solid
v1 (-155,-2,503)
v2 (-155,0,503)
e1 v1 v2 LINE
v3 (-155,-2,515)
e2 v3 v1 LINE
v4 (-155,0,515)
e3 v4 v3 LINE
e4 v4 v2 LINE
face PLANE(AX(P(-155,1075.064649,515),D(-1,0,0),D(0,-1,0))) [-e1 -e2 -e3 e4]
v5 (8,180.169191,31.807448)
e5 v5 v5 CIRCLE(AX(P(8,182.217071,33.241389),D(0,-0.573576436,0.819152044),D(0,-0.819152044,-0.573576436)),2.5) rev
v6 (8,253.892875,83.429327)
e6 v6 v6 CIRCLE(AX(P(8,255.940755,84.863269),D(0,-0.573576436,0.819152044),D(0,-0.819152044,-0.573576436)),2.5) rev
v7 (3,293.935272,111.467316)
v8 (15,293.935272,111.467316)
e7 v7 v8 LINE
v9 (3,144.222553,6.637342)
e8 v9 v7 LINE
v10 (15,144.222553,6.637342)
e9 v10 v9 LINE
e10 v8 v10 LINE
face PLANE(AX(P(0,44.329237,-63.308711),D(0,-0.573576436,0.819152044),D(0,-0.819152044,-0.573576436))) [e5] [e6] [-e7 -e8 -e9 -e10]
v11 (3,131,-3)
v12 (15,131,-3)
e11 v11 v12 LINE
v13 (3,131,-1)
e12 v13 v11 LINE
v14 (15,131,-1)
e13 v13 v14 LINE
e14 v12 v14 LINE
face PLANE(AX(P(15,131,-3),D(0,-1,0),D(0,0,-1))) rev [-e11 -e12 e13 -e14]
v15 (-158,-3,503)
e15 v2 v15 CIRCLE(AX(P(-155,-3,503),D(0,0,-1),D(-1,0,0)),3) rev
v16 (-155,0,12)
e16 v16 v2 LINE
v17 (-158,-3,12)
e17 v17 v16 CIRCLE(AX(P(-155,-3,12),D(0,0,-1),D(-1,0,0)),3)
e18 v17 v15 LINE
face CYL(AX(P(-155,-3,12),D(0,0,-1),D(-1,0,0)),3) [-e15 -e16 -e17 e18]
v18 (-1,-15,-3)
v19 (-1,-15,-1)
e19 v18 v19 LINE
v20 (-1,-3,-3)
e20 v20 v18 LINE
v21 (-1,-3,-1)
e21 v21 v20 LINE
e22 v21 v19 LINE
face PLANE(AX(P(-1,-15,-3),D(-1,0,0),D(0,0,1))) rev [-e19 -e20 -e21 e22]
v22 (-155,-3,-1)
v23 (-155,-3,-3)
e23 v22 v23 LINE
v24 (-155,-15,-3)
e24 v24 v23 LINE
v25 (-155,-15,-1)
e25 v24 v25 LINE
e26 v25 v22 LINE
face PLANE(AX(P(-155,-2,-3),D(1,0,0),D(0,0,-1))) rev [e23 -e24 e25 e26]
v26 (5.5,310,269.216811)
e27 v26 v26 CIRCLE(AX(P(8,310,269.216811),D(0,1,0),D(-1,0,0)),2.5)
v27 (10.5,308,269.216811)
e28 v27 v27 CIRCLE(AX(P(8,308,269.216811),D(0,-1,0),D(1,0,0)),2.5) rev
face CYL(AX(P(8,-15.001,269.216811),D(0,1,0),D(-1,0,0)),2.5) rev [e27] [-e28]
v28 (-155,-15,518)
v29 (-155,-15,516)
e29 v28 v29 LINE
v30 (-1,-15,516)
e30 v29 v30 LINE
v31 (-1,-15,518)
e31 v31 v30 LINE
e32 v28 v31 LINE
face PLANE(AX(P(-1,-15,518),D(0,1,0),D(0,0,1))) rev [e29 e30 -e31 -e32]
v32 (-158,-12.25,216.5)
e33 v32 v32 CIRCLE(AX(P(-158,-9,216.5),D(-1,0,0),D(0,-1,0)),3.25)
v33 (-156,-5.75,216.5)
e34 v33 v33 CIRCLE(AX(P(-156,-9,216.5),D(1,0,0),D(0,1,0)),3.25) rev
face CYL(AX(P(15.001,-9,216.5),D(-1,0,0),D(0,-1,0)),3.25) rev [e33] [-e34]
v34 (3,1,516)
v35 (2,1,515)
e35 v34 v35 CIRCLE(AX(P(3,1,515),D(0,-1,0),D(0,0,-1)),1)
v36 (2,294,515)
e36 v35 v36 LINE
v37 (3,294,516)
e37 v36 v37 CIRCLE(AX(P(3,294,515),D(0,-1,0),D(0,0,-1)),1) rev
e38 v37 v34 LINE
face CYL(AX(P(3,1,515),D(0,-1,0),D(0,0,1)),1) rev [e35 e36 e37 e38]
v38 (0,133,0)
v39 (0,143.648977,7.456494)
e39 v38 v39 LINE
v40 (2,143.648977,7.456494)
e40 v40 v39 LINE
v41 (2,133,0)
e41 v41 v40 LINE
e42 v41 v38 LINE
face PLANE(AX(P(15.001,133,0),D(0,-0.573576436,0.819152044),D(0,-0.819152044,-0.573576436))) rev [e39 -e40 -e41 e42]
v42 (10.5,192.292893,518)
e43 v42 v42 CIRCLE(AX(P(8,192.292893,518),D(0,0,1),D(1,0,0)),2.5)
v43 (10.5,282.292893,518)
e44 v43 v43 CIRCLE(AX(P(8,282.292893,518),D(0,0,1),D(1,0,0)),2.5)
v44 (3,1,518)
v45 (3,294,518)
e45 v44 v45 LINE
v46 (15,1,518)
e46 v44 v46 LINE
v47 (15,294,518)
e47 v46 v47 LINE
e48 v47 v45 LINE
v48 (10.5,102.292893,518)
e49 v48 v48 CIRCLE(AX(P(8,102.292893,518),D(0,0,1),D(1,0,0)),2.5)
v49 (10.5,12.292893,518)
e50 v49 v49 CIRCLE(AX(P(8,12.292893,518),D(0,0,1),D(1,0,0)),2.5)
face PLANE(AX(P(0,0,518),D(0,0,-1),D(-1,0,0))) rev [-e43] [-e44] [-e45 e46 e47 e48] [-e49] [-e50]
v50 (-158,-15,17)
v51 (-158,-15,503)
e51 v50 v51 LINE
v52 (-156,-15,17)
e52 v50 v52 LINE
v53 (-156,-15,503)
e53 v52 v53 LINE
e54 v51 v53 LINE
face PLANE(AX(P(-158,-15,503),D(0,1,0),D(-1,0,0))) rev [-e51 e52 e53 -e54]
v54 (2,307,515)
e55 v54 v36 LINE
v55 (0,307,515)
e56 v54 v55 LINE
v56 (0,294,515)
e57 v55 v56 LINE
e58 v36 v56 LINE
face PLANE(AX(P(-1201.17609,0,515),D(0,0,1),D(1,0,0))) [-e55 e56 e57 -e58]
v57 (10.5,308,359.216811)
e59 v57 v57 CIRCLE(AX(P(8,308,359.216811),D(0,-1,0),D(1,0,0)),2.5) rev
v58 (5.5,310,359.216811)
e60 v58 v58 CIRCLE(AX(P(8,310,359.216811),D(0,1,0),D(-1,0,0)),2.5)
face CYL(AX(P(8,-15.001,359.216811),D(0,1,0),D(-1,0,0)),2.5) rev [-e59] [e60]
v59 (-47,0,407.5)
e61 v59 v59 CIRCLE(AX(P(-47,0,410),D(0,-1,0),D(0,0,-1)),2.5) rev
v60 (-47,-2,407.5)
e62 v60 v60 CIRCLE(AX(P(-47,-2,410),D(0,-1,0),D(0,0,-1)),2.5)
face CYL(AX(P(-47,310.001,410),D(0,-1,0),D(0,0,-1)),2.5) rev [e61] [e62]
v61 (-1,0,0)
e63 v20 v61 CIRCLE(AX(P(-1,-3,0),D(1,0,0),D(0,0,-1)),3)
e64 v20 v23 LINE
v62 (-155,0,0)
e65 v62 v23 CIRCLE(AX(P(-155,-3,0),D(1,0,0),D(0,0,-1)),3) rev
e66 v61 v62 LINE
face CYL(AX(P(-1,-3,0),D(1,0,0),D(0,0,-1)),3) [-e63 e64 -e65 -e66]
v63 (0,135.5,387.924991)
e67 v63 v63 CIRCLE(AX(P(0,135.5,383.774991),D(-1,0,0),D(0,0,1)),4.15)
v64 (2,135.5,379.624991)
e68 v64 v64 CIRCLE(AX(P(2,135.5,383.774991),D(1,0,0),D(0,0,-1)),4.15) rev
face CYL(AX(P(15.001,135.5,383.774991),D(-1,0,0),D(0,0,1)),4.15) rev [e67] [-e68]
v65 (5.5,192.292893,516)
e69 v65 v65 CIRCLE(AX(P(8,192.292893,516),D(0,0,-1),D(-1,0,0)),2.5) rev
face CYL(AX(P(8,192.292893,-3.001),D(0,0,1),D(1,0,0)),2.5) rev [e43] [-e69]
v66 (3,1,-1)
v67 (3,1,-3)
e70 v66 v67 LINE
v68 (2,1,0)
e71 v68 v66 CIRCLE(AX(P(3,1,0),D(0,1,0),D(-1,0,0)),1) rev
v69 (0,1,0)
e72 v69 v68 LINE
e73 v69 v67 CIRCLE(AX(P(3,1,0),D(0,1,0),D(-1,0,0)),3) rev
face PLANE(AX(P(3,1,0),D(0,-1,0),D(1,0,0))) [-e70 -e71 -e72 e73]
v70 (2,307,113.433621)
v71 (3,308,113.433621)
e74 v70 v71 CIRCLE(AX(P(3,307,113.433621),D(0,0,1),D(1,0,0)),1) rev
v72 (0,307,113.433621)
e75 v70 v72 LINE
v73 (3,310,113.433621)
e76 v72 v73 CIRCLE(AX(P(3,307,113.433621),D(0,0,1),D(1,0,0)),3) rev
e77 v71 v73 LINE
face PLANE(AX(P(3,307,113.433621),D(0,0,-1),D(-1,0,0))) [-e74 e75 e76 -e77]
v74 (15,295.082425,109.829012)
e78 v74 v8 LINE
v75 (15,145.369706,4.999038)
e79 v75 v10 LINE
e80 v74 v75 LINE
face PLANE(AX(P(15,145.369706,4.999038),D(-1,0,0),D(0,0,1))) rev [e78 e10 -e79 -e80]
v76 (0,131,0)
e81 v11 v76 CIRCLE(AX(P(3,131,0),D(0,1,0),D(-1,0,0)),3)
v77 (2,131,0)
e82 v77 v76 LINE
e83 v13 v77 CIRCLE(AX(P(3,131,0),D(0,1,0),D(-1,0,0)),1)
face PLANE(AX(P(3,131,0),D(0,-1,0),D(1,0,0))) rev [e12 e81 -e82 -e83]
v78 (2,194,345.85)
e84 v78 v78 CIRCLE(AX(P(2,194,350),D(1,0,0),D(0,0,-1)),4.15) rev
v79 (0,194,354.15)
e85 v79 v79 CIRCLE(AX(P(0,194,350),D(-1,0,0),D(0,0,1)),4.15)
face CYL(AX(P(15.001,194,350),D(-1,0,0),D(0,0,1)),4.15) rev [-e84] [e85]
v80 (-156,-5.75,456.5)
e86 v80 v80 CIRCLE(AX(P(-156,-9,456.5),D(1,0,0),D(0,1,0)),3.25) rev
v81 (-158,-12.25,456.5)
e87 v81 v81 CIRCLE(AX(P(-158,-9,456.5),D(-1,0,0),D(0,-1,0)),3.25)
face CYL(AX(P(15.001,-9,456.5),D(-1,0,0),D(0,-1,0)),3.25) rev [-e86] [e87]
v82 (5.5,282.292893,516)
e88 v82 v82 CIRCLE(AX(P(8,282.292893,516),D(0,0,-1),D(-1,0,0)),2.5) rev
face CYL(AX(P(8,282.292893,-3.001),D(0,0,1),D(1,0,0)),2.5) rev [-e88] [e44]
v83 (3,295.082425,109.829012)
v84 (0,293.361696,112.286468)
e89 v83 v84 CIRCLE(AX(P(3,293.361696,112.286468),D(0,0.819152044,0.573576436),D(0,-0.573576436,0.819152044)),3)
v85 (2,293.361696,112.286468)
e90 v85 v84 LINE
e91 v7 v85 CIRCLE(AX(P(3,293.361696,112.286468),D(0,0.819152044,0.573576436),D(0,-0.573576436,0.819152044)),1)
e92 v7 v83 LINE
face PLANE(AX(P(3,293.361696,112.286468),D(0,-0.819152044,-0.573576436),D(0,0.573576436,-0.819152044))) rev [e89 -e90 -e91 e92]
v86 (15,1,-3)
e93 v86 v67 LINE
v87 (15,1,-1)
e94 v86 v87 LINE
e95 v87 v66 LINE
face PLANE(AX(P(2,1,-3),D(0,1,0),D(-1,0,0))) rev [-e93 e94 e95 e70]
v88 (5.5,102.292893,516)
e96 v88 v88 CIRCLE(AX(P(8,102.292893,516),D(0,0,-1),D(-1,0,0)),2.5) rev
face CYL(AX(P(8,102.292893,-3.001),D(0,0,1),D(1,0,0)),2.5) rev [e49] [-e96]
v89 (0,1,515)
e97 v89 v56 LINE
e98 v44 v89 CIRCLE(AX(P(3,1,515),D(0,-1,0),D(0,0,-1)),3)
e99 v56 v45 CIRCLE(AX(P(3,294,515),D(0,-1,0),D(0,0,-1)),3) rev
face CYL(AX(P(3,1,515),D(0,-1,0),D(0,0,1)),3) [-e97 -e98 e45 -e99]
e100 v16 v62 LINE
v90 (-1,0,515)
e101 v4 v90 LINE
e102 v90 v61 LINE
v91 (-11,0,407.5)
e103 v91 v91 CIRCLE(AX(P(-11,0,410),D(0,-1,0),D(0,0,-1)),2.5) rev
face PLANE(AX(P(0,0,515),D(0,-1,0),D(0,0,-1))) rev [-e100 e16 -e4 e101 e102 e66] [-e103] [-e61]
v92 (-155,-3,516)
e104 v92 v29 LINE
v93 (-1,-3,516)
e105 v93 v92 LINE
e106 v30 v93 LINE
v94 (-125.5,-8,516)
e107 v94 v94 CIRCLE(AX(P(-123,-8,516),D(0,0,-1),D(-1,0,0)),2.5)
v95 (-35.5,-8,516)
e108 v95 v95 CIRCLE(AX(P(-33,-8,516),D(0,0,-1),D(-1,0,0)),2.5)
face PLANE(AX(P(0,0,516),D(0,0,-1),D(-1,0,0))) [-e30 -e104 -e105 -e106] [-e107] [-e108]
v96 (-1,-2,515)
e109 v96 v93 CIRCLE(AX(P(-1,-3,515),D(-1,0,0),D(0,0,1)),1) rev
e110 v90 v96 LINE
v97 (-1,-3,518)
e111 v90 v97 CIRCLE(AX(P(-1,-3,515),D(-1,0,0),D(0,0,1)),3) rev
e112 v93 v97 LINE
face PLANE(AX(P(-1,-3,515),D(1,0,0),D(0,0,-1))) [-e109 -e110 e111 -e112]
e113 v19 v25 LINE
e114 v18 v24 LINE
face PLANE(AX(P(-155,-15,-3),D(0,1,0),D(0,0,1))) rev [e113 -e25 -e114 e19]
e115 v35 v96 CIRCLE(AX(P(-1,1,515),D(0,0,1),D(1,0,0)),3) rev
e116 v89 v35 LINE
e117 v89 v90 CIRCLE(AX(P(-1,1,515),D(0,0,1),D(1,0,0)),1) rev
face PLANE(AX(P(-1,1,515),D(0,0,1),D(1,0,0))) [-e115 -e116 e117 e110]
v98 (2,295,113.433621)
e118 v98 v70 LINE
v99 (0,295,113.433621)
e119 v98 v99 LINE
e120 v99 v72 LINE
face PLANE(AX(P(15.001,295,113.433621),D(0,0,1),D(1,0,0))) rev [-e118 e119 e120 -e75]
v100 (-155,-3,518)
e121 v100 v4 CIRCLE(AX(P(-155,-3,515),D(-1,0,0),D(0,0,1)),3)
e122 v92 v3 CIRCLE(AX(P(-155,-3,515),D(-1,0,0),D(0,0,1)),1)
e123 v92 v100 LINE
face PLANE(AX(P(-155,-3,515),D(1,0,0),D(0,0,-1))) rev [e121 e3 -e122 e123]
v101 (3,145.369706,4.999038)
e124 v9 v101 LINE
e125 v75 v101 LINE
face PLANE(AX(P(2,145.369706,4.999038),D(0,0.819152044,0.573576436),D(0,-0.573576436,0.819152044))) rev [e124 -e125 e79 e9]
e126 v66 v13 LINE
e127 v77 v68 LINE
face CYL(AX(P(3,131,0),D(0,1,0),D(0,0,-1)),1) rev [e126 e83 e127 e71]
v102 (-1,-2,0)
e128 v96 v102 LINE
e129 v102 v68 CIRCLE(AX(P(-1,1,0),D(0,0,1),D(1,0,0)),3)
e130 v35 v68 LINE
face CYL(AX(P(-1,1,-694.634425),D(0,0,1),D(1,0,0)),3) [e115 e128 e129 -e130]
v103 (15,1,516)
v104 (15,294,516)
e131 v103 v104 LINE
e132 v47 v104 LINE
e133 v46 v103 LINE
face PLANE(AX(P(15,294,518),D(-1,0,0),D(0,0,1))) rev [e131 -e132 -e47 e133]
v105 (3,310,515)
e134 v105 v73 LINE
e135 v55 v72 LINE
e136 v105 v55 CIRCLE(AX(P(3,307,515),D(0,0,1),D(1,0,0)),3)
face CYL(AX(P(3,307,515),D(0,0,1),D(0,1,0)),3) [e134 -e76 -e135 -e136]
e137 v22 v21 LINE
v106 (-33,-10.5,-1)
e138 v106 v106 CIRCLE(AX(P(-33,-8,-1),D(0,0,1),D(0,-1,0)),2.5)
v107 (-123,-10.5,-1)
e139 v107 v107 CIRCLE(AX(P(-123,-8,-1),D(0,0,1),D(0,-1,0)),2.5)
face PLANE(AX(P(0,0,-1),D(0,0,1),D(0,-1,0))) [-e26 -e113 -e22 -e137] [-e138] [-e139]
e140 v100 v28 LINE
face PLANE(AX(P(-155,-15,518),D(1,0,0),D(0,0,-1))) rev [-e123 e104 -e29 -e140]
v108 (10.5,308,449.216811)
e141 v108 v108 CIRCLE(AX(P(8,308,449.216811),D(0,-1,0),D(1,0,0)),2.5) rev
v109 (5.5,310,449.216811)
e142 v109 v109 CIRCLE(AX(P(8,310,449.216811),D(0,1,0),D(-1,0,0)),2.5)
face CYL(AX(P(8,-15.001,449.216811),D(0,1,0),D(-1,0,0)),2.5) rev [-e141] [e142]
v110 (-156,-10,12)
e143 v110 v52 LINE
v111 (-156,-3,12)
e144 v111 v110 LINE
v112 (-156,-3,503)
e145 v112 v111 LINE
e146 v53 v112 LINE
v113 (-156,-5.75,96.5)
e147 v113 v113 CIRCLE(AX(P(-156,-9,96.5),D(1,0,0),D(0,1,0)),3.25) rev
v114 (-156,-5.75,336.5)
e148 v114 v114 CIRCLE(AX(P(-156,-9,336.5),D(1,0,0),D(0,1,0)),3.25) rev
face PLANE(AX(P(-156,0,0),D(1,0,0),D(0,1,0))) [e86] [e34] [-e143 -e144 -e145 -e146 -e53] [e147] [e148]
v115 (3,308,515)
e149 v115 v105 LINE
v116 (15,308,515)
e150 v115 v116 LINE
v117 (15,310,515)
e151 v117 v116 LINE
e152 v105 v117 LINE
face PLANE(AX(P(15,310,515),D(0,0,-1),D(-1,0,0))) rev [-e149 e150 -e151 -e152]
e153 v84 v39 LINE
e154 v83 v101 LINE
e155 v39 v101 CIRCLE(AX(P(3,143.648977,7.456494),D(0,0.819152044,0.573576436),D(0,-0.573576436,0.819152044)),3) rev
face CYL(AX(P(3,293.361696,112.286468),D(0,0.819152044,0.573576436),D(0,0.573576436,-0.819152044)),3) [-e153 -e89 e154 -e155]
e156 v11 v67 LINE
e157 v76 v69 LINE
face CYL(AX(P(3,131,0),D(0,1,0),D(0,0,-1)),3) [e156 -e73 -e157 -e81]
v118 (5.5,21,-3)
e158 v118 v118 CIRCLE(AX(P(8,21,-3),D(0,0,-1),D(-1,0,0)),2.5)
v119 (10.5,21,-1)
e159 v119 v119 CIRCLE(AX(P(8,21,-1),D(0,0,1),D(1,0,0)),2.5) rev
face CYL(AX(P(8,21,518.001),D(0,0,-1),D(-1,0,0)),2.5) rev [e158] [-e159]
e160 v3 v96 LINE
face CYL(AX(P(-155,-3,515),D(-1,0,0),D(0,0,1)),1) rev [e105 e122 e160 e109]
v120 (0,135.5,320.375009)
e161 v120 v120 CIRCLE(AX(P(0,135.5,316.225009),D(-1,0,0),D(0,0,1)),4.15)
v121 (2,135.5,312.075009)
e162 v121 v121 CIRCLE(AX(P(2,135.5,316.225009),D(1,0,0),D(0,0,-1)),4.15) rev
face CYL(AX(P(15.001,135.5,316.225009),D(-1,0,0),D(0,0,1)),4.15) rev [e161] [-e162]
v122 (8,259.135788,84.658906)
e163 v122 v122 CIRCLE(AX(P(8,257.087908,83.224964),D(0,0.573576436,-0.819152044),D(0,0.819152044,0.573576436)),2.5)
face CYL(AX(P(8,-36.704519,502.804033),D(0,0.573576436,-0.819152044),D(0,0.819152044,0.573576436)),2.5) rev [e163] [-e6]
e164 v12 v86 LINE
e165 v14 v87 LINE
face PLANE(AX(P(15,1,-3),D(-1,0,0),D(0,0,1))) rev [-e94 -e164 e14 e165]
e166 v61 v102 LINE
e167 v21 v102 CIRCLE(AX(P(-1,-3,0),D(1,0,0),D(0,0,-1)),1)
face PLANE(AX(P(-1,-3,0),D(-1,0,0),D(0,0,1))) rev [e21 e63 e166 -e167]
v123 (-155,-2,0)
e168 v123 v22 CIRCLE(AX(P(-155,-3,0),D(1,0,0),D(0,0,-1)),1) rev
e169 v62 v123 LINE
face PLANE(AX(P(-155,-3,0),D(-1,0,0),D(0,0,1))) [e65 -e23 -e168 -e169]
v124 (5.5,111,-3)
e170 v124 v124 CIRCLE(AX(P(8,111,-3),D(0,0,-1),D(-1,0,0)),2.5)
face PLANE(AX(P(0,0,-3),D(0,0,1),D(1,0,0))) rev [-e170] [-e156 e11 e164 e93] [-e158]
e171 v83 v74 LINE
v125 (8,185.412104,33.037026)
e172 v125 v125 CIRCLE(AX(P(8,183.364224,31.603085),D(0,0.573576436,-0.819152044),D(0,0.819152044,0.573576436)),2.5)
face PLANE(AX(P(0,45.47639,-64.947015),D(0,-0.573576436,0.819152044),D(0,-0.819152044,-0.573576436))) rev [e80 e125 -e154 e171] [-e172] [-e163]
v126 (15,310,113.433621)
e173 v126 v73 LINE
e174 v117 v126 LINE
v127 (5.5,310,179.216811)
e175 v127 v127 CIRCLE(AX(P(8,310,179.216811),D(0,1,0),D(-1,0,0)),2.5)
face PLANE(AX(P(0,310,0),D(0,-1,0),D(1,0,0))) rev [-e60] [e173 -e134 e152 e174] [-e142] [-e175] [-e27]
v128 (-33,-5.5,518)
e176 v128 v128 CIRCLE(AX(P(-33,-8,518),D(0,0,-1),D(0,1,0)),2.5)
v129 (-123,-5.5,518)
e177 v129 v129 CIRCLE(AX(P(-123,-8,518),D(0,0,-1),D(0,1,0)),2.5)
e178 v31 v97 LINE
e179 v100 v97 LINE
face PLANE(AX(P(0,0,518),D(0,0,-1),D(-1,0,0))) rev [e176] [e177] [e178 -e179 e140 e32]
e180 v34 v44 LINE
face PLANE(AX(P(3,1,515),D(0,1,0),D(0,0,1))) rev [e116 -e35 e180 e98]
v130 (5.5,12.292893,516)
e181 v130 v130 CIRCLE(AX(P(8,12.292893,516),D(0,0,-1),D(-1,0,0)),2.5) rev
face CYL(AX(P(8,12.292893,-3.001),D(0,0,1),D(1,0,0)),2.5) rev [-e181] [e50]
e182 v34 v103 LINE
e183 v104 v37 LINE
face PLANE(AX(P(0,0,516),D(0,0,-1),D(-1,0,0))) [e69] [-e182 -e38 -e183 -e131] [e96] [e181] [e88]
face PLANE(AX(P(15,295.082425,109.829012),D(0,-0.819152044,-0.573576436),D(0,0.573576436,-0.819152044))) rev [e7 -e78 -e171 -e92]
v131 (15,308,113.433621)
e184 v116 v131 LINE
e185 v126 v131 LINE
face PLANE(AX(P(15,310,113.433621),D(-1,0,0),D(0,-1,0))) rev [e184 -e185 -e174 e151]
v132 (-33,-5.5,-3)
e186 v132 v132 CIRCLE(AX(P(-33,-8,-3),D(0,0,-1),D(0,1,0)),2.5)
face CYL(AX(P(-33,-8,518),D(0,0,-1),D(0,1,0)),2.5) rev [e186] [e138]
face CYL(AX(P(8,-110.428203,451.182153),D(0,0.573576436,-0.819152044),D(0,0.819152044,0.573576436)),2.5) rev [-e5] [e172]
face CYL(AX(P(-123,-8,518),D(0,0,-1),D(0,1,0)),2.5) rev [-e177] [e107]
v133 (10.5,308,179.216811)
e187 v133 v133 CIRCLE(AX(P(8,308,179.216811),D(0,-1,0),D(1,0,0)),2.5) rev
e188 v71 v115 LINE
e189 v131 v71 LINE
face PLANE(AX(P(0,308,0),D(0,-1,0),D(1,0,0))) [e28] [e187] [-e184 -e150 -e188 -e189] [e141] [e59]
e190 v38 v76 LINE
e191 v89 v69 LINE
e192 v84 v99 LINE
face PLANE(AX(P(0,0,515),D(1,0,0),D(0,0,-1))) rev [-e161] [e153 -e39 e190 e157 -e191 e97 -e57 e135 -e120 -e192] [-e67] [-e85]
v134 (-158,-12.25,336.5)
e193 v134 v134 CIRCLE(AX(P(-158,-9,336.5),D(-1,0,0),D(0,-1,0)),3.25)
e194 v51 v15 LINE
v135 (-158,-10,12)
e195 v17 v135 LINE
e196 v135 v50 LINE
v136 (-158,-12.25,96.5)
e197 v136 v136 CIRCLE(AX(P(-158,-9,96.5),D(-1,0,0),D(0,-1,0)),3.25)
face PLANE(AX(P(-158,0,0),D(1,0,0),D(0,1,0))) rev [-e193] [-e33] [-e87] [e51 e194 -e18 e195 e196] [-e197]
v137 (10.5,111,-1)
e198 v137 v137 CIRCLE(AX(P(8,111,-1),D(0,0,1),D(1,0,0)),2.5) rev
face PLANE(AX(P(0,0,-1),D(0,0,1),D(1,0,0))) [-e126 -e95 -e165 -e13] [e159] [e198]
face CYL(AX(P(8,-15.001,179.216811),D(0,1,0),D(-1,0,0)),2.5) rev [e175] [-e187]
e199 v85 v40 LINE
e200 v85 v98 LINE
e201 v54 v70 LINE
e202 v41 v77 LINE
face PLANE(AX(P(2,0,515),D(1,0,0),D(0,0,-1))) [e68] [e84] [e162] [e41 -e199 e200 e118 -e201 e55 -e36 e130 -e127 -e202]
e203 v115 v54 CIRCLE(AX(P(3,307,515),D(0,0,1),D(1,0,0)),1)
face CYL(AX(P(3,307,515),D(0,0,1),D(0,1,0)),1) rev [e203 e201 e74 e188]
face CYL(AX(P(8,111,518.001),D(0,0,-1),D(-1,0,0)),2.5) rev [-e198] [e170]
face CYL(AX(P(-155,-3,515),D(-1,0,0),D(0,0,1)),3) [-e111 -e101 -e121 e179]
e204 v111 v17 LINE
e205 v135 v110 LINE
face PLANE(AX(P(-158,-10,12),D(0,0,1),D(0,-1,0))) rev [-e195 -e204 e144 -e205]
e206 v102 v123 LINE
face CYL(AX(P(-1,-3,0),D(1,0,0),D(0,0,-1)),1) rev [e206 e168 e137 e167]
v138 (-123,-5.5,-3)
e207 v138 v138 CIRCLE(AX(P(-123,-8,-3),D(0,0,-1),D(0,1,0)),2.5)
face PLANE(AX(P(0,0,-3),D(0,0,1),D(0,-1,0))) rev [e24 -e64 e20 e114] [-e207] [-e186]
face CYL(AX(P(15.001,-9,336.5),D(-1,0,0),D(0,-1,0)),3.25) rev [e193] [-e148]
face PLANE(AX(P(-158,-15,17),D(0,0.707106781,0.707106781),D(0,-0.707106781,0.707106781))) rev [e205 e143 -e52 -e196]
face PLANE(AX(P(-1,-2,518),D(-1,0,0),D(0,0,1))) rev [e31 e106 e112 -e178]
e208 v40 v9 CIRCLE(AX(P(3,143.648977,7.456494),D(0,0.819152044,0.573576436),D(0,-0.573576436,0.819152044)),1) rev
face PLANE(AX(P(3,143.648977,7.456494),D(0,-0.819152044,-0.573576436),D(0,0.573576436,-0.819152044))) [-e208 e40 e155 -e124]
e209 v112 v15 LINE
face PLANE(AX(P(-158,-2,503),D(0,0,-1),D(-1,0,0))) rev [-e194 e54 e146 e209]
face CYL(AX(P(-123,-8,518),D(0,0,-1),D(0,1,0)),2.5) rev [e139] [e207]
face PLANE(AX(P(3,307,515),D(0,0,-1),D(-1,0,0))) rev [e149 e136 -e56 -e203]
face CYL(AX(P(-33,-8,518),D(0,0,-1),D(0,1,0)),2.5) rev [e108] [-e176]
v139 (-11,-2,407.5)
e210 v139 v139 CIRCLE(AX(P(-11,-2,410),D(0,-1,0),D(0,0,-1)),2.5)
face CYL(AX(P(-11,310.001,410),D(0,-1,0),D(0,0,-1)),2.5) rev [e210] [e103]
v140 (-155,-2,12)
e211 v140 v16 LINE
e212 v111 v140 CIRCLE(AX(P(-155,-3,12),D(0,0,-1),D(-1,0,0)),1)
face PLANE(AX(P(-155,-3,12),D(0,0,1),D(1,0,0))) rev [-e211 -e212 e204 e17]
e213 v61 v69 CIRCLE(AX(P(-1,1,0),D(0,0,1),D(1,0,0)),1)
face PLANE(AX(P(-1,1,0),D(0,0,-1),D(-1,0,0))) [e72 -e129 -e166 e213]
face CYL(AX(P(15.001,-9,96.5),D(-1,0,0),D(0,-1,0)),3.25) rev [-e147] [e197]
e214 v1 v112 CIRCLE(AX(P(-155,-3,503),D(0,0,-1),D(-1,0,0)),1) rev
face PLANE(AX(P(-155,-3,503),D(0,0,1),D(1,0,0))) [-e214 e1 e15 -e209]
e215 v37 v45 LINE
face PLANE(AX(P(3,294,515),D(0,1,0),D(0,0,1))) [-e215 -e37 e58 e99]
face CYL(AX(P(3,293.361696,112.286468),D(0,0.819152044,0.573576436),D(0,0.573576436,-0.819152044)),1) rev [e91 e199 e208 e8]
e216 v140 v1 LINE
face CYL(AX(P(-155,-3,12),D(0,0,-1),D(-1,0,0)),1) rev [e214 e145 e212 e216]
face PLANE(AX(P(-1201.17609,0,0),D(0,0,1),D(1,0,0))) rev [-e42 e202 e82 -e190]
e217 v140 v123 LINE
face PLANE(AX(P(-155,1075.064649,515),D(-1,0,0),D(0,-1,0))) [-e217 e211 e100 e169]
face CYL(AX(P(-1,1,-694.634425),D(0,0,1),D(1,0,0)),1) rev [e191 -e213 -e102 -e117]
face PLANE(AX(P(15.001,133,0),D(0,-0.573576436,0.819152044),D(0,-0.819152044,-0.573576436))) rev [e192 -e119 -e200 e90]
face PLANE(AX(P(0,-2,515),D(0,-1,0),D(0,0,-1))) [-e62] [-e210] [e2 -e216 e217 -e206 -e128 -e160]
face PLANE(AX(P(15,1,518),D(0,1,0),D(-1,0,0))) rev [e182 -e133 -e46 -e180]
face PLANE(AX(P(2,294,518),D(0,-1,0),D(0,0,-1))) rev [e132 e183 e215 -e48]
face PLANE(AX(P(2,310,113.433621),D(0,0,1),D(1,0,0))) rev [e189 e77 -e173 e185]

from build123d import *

# Parameters (mm, degrees)
EXTRUDE_1_DEPTH                  = 515
SHEET_METAL_1_OUTLINE_W          = 155
SHEET_METAL_1_OUTLINE_H          = 2
SHEET_METAL_1_DEPTH              = 515
SHEET_METAL_1_2_OUTLINE_W        = 2
SHEET_METAL_1_2_OUTLINE_H        = 154.141592654
SHEET_METAL_1_2_DEPTH            = 515
SHEET_METAL_1_3_DEPTH            = 515
SHEET_METAL_1_3_2_DEPTH          = 515
SM_EDGE_FLANGE_1_DEPTH           = 154
SM_EDGE_FLANGE_1_BEND_DEPTH      = 130
SM_EDGE_FLANGE_1_BEND_2_DEPTH    = 154
SM_EDGE_FLANGE_1_BEND_3_DEPTH    = 491
SM_START                         = 2
SM_EDGE_FLANGE_1_FLAT_DEPTH      = 2
SM_EDGE_FLANGE_1_BEND_4_DEPTH    = 293
CUT_EXTRUDE_1_REACH              = 626.01
SKETCH_21_R                      = 4.15
CUT_EXTRUDE_2_REACH              = 626.01
SM_EDGE_FLANGE_3_STRIP_W         = 10
SM_EDGE_FLANGE_3_STRIP_H         = 2
SM_EDGE_FLANGE_3_STRIP_CUT_DEPTH = 401.56637881
SM_EDGE_FLANGE_3_DEPTH           = 401.56637881
SM_EDGE_FLANGE_4_DEPTH           = 182.765483379
SKETCH_36_R                      = 2.5
CUT_EXTRUDE_2624_DEPTH           = 627.502194729
CUT_EXTRUDE_2823_REACH           = 628.502
SKETCH_38_R                      = 2.5
CUT_EXTRUDE_3033_REACH           = 661.366
SKETCH_39_R                      = 2.5
CUT_EXTRUDE_3335_REACH           = 628.502
SKETCH_40_R                      = 2.5
CUT_EXTRUDE_8_REACH              = 633.596
SKETCH_41_R                      = 2.5
CUT_EXTRUDE_4081_REACH           = 629.975
SKETCH_42_R                      = 3.25
CUT_EXTRUDE_10_REACH             = 627.006
SKETCH_43_R                      = 2.5


# Read off the part's stored shape, not the designer's step: Плоское состояние1, Согнутое состояние1
# Sheet-metal steps are written as plain solids
with BuildPart() as part:
    # Sketch 1 → Вытянуть-Тонкостенный1 (new body)
    with BuildSketch(Plane.XY):
        Polygon((-155, 0), (0, 0), (0, 310), (2, 310), (2, -2), (-155, -2), align=None)
    extrude(amount=EXTRUDE_1_DEPTH)

    # Sheet Metal 1 outline → Sheet Metal 1 (cut)
    with BuildSketch(Plane.XY):
        with Locations((-77.5, -1)):
            Rectangle(SHEET_METAL_1_OUTLINE_W, SHEET_METAL_1_OUTLINE_H)
    extrude(amount=SHEET_METAL_1_DEPTH, mode=Mode.SUBTRACT)

    # Sheet Metal 1 2 outline → Sheet Metal 1 2 (add)
    with BuildSketch(Plane.XY):
        with Locations((1, -79.070796327)):
            Rectangle(SHEET_METAL_1_2_OUTLINE_W, SHEET_METAL_1_2_OUTLINE_H)
    extrude(amount=SHEET_METAL_1_2_DEPTH)

    # Sheet Metal 1 3 outline → Sheet Metal 1 3 (cut)
    with BuildSketch(Plane.XY):
        with BuildLine():
            ThreePointArc((2, 1), (1.449489743, -0.732050808), (0, -1.828427125))
            Line((0, -1.828427125), (0, -156.141592654))
            Line((0, -156.141592654), (2, -156.141592654))
            Line((2, -156.141592654), (2, 1))
        make_face()
    extrude(amount=SHEET_METAL_1_3_DEPTH, mode=Mode.SUBTRACT)

    # Sheet Metal 1 3 2 outline → Sheet Metal 1 3 2 (add)
    with BuildSketch(Plane.XY):
        with BuildLine():
            Line((-1, 0), (-155, 0))
            Line((-155, 0), (-155, -2))
            Line((-155, -2), (-1, -2))
            ThreePointArc((-1, -2), (-0.492694064, -1.956795679), (0, -1.828427125))
            Line((0, -1.828427125), (0, 1))
            ThreePointArc((0, 1), (-0.292893219, 0.292893219), (-1, 0))
        make_face()
    extrude(amount=SHEET_METAL_1_3_2_DEPTH)

    # Ребро-кромка1 section (across the edge) → Ребро-кромка1 (add)
    with BuildSketch(Plane(origin=(-155, -2, -1), x_dir=(0, 0, 1), z_dir=(1, 0, 0))):
        with BuildLine():
            Line((-2, 1), (-2, 13))
            Line((-2, 13), (0, 13))
            Line((0, 13), (0, 1))
            ThreePointArc((0, 1), (0.292893219, 0.292893219), (1, 0))
            Line((1, 0), (1, -2))
            ThreePointArc((1, -2), (-1.121320344, -1.121320344), (-2, 1))
        make_face()
    extrude(amount=SM_EDGE_FLANGE_1_DEPTH)

    # Ребро-кромка1 section 2 (across the edge) → Ребро-кромка1 bend (add)
    with BuildSketch(Plane(origin=(2, 1, -1), x_dir=(0, 0, 1), z_dir=(0, 1, 0))):
        with BuildLine():
            Line((-2, 1), (-2, 13))
            Line((-2, 13), (0, 13))
            Line((0, 13), (0, 1))
            ThreePointArc((0, 1), (0.292893219, 0.292893219), (1, 0))
            Line((1, 0), (1, -2))
            ThreePointArc((1, -2), (-1.121320344, -1.121320344), (-2, 1))
        make_face()
    extrude(amount=SM_EDGE_FLANGE_1_BEND_DEPTH)

    # Ребро-кромка1 section 3 (across the edge) → Ребро-кромка1 bend 2 (add)
    with BuildSketch(Plane(origin=(-1, -2, 516), x_dir=(0, 0, -1), z_dir=(-1, 0, 0))):
        with BuildLine():
            Line((-2, 1), (-2, 13))
            Line((-2, 13), (0, 13))
            Line((0, 13), (0, 1))
            ThreePointArc((0, 1), (0.292893219, 0.292893219), (1, 0))
            Line((1, 0), (1, -2))
            ThreePointArc((1, -2), (-1.121320344, -1.121320344), (-2, 1))
        make_face()
    extrude(amount=SM_EDGE_FLANGE_1_BEND_2_DEPTH)

    # Ребро-кромка1 bend section (across the edge) → Ребро-кромка1 bend 3 (add)
    with BuildSketch(Plane(origin=(-156, -2, 503), x_dir=(1, 0, 0), z_dir=(0, 0, -1))):
        with BuildLine():
            Line((-2, 1), (0, 1))
            ThreePointArc((0, 1), (0.292893219, 0.292893219), (1, 0))
            Line((1, 0), (1, -2))
            ThreePointArc((1, -2), (-1.121320344, -1.121320344), (-2, 1))
        make_face()
    extrude(amount=SM_EDGE_FLANGE_1_BEND_3_DEPTH)

    # Ребро-кромка1 profile (on flange) → Ребро-кромка1 flat (add)
    with BuildSketch(Plane(origin=(-156, -2, 0), x_dir=(0, 0, -1), z_dir=(-1, 0, 0)).offset(SM_START)):
        Polygon((-503, 13), (-503, 1), (-12, 1), (-12, 8), (-17, 13), align=None)
    extrude(amount=-SM_EDGE_FLANGE_1_FLAT_DEPTH)

    # Ребро-кромка1 section 4 (across the edge) → Ребро-кромка1 bend 4 (add)
    with BuildSketch(Plane(origin=(2, 294, 516), x_dir=(0, 0, -1), z_dir=(0, -1, 0))):
        with BuildLine():
            Line((-2, 1), (-2, 13))
            Line((-2, 13), (0, 13))
            Line((0, 13), (0, 1))
            ThreePointArc((0, 1), (0.292893219, 0.292893219), (1, 0))
            Line((1, 0), (1, -2))
            ThreePointArc((1, -2), (-1.121320344, -1.121320344), (-2, 1))
        make_face()
    extrude(amount=SM_EDGE_FLANGE_1_BEND_4_DEPTH)

    # Эскиз21 → Вырез-Вытянуть1 (cut, up to next)
    with BuildSketch(Plane.ZY, mode=Mode.PRIVATE) as cut_extrude_1_sk1:
        with Locations((316.225009252, 135.5)):
            Circle(SKETCH_21_R)
    cut_extrude_1_tool1 = extrude(cut_extrude_1_sk1.sketch, amount=-CUT_EXTRUDE_1_REACH, mode=Mode.PRIVATE) & part.part
    # Эскиз21 → Вырез-Вытянуть1 (cut, up to next)
    with BuildSketch(Plane.ZY, mode=Mode.PRIVATE) as cut_extrude_1_sk2:
        with Locations((383.774990748, 135.5)):
            Circle(SKETCH_21_R)
    cut_extrude_1_tool2 = extrude(cut_extrude_1_sk2.sketch, amount=-CUT_EXTRUDE_1_REACH, mode=Mode.PRIVATE) & part.part
    # Эскиз21 → Вырез-Вытянуть1 (cut, up to next)
    with BuildSketch(Plane.ZY, mode=Mode.PRIVATE) as cut_extrude_1_sk3:
        with Locations((350, 194)):
            Circle(SKETCH_21_R)
    cut_extrude_1_tool3 = extrude(cut_extrude_1_sk3.sketch, amount=-CUT_EXTRUDE_1_REACH, mode=Mode.PRIVATE) & part.part
    add(cut_extrude_1_tool1.solids().sort_by_distance((0, 135.5, 316.225009))[0], mode=Mode.SUBTRACT)
    add(cut_extrude_1_tool2.solids().sort_by_distance((0, 135.5, 383.774991))[0], mode=Mode.SUBTRACT)
    add(cut_extrude_1_tool3.solids().sort_by_distance((0, 194, 350))[0], mode=Mode.SUBTRACT)

    # Эскиз22 → Вырез-Вытянуть2 (cut, up to next)
    with BuildSketch(Plane.ZY, mode=Mode.PRIVATE) as cut_extrude_2_sk1:
        Polygon((0, 133), (113.43362119, 295), (113.43362119, 310), (0, 310), align=None)
    cut_extrude_2_tool1 = extrude(cut_extrude_2_sk1.sketch, amount=-CUT_EXTRUDE_2_REACH, mode=Mode.PRIVATE) & part.part
    add(cut_extrude_2_tool1.solids().sort_by_distance((0, 250.609375, 40.765208))[0], mode=Mode.SUBTRACT)

    # Ребро-кромка3 strip (across the edge) → Ребро-кромка3 strip cut (cut)
    with BuildSketch(Plane(origin=(2, 310, 113.43362119), x_dir=(0, -1, 0), z_dir=(0, 0, 1))):
        with Locations((-2, -1)):
            Rectangle(SM_EDGE_FLANGE_3_STRIP_W, SM_EDGE_FLANGE_3_STRIP_H)
    extrude(amount=SM_EDGE_FLANGE_3_STRIP_CUT_DEPTH, mode=Mode.SUBTRACT)

    # Ребро-кромка3 section (across the edge) → Ребро-кромка3 (add)
    with BuildSketch(Plane(origin=(2, 310, 113.43362119), x_dir=(0, -1, 0), z_dir=(0, 0, 1))):
        with BuildLine():
            Line((0, 1), (0, 13))
            Line((0, 13), (2, 13))
            Line((2, 13), (2, 1))
            ThreePointArc((2, 1), (2.292893219, 0.292893219), (3, 0))
            Line((3, 0), (3, -2))
            ThreePointArc((3, -2), (0.878679656, -1.121320344), (0, 1))
        make_face()
    extrude(amount=SM_EDGE_FLANGE_3_DEPTH)

    # Ребро-кромка4 section (across the edge) → Ребро-кромка4 (add)
    with BuildSketch(Plane(origin=(2, 144.222553012, 6.637341628), x_dir=(3.4914813388431334e-15, -0.5735764363510413, 0.8191520442889951), z_dir=(0, 0.8191520442889951, 0.5735764363510413))):
        with BuildLine():
            Line((-2, 1), (-2, 13))
            Line((-2, 13), (0, 13))
            Line((0, 13), (0, 1))
            ThreePointArc((0, 1), (0.292893219, 0.292893219), (1, 0))
            Line((1, 0), (1, -2))
            ThreePointArc((1, -2), (-1.121320344, -1.121320344), (-2, 1))
        make_face()
    extrude(amount=SM_EDGE_FLANGE_4_DEPTH)

    # Эскиз36 → Cut-Extrude 2624 (cut, through all)
    with BuildSketch(Plane(origin=(0, 0, -3), x_dir=(-1, 0, 0), z_dir=(0, 0, -1))):
        with Locations(Location((33, -8, 0), (0, 0, 90))):
            Circle(SKETCH_36_R)
        with Locations(Location((123, -8, 0), (0, 0, 90))):
            Circle(SKETCH_36_R)
    extrude(amount=-CUT_EXTRUDE_2624_DEPTH, mode=Mode.SUBTRACT)

    # Эскиз38 → Cut-Extrude 2823 (cut, up to next)
    with BuildSketch(Plane(origin=(0, 0, -3), x_dir=(-1, 0, 0), z_dir=(0, 0, -1)), mode=Mode.PRIVATE) as cut_extrude_2823_sk1:
        with Locations((-8, 111)):
            Circle(SKETCH_38_R)
    cut_extrude_2823_tool1 = extrude(cut_extrude_2823_sk1.sketch, amount=-CUT_EXTRUDE_2823_REACH, mode=Mode.PRIVATE) & part.part
    # Эскиз38 → Cut-Extrude 2823 (cut, up to next)
    with BuildSketch(Plane(origin=(0, 0, -3), x_dir=(-1, 0, 0), z_dir=(0, 0, -1)), mode=Mode.PRIVATE) as cut_extrude_2823_sk2:
        with Locations((-8, 21)):
            Circle(SKETCH_38_R)
    cut_extrude_2823_tool2 = extrude(cut_extrude_2823_sk2.sketch, amount=-CUT_EXTRUDE_2823_REACH, mode=Mode.PRIVATE) & part.part
    add(cut_extrude_2823_tool1.solids().sort_by_distance((8, 111, -3))[0], mode=Mode.SUBTRACT)
    add(cut_extrude_2823_tool2.solids().sort_by_distance((8, 21, -3))[0], mode=Mode.SUBTRACT)

    # Эскиз39 → Cut-Extrude 3033 (cut, up to next)
    with BuildSketch(Plane(origin=(0, 45.476389778, -64.947015415), x_dir=(-1, 0, 0), z_dir=(-1.7489258850738628e-15, 0.5735764363510414, -0.8191520442889951)), mode=Mode.PRIVATE) as cut_extrude_3033_sk1:
        with Locations(Location((-8, 258.32996358, 0), (0, 0, 90))):
            Circle(SKETCH_39_R)
    cut_extrude_3033_tool1 = extrude(cut_extrude_3033_sk1.sketch, amount=-CUT_EXTRUDE_3033_REACH, mode=Mode.PRIVATE) & part.part
    # Эскиз39 → Cut-Extrude 3033 (cut, up to next)
    with BuildSketch(Plane(origin=(0, 45.476389778, -64.947015415), x_dir=(-1, 0, 0), z_dir=(-1.7489258850738628e-15, 0.5735764363510414, -0.8191520442889951)), mode=Mode.PRIVATE) as cut_extrude_3033_sk2:
        with Locations(Location((-8, 168.32996358, 0), (0, 0, 90))):
            Circle(SKETCH_39_R)
    cut_extrude_3033_tool2 = extrude(cut_extrude_3033_sk2.sketch, amount=-CUT_EXTRUDE_3033_REACH, mode=Mode.PRIVATE) & part.part
    add(cut_extrude_3033_tool1.solids().sort_by_distance((8, 257.087908, 83.224964))[0], mode=Mode.SUBTRACT)
    add(cut_extrude_3033_tool2.solids().sort_by_distance((8, 183.364224, 31.603085))[0], mode=Mode.SUBTRACT)

    # Эскиз40 → Cut-Extrude 3335 (cut, up to next)
    with BuildSketch(Plane.XY.offset(518), mode=Mode.PRIVATE) as cut_extrude_3335_sk1:
        with Locations((8, 282.292893219)):
            Circle(SKETCH_40_R)
    cut_extrude_3335_tool1 = extrude(cut_extrude_3335_sk1.sketch, amount=-CUT_EXTRUDE_3335_REACH, mode=Mode.PRIVATE) & part.part
    # Эскиз40 → Cut-Extrude 3335 (cut, up to next)
    with BuildSketch(Plane.XY.offset(518), mode=Mode.PRIVATE) as cut_extrude_3335_sk2:
        with Locations((8, 192.292893219)):
            Circle(SKETCH_40_R)
    cut_extrude_3335_tool2 = extrude(cut_extrude_3335_sk2.sketch, amount=-CUT_EXTRUDE_3335_REACH, mode=Mode.PRIVATE) & part.part
    # Эскиз40 → Cut-Extrude 3335 (cut, up to next)
    with BuildSketch(Plane.XY.offset(518), mode=Mode.PRIVATE) as cut_extrude_3335_sk3:
        with Locations((8, 102.292893219)):
            Circle(SKETCH_40_R)
    cut_extrude_3335_tool3 = extrude(cut_extrude_3335_sk3.sketch, amount=-CUT_EXTRUDE_3335_REACH, mode=Mode.PRIVATE) & part.part
    # Эскиз40 → Cut-Extrude 3335 (cut, up to next)
    with BuildSketch(Plane.XY.offset(518), mode=Mode.PRIVATE) as cut_extrude_3335_sk4:
        with Locations((8, 12.292893219)):
            Circle(SKETCH_40_R)
    cut_extrude_3335_tool4 = extrude(cut_extrude_3335_sk4.sketch, amount=-CUT_EXTRUDE_3335_REACH, mode=Mode.PRIVATE) & part.part
    add(cut_extrude_3335_tool1.solids().sort_by_distance((8, 282.292893, 518))[0], mode=Mode.SUBTRACT)
    add(cut_extrude_3335_tool2.solids().sort_by_distance((8, 192.292893, 518))[0], mode=Mode.SUBTRACT)
    add(cut_extrude_3335_tool3.solids().sort_by_distance((8, 102.292893, 518))[0], mode=Mode.SUBTRACT)
    add(cut_extrude_3335_tool4.solids().sort_by_distance((8, 12.292893, 518))[0], mode=Mode.SUBTRACT)

    # Эскиз41 → Вырез-Вытянуть8 (cut, up to next)
    with BuildSketch(Plane(origin=(0, 310, 0), x_dir=(1, 0, 0), z_dir=(0, 1, 0)), mode=Mode.PRIVATE) as cut_extrude_8_sk1:
        with Locations(Location((8, -449.216810595, 0), (0, 0, 180))):
            Circle(SKETCH_41_R)
    cut_extrude_8_tool1 = extrude(cut_extrude_8_sk1.sketch, amount=-CUT_EXTRUDE_8_REACH, mode=Mode.PRIVATE) & part.part
    # Эскиз41 → Вырез-Вытянуть8 (cut, up to next)
    with BuildSketch(Plane(origin=(0, 310, 0), x_dir=(1, 0, 0), z_dir=(0, 1, 0)), mode=Mode.PRIVATE) as cut_extrude_8_sk2:
        with Locations(Location((8, -359.216810595, 0), (0, 0, 180))):
            Circle(SKETCH_41_R)
    cut_extrude_8_tool2 = extrude(cut_extrude_8_sk2.sketch, amount=-CUT_EXTRUDE_8_REACH, mode=Mode.PRIVATE) & part.part
    # Эскиз41 → Вырез-Вытянуть8 (cut, up to next)
    with BuildSketch(Plane(origin=(0, 310, 0), x_dir=(1, 0, 0), z_dir=(0, 1, 0)), mode=Mode.PRIVATE) as cut_extrude_8_sk3:
        with Locations(Location((8, -269.216810595, 0), (0, 0, 180))):
            Circle(SKETCH_41_R)
    cut_extrude_8_tool3 = extrude(cut_extrude_8_sk3.sketch, amount=-CUT_EXTRUDE_8_REACH, mode=Mode.PRIVATE) & part.part
    # Эскиз41 → Вырез-Вытянуть8 (cut, up to next)
    with BuildSketch(Plane(origin=(0, 310, 0), x_dir=(1, 0, 0), z_dir=(0, 1, 0)), mode=Mode.PRIVATE) as cut_extrude_8_sk4:
        with Locations(Location((8, -179.216810595, 0), (0, 0, 180))):
            Circle(SKETCH_41_R)
    cut_extrude_8_tool4 = extrude(cut_extrude_8_sk4.sketch, amount=-CUT_EXTRUDE_8_REACH, mode=Mode.PRIVATE) & part.part
    add(cut_extrude_8_tool1.solids().sort_by_distance((8, 310, 449.216811))[0], mode=Mode.SUBTRACT)
    add(cut_extrude_8_tool2.solids().sort_by_distance((8, 310, 359.216811))[0], mode=Mode.SUBTRACT)
    add(cut_extrude_8_tool3.solids().sort_by_distance((8, 310, 269.216811))[0], mode=Mode.SUBTRACT)
    add(cut_extrude_8_tool4.solids().sort_by_distance((8, 310, 179.216811))[0], mode=Mode.SUBTRACT)

    # Эскиз42 → Cut-Extrude 4081 (cut, up to next)
    with BuildSketch(Plane.ZY.offset(158), mode=Mode.PRIVATE) as cut_extrude_4081_sk1:
        with Locations(Location((96.5, -9, 0), (0, 0, 270))):
            Circle(SKETCH_42_R)
    cut_extrude_4081_tool1 = extrude(cut_extrude_4081_sk1.sketch, amount=-CUT_EXTRUDE_4081_REACH, mode=Mode.PRIVATE) & part.part
    # Эскиз42 → Cut-Extrude 4081 (cut, up to next)
    with BuildSketch(Plane.ZY.offset(158), mode=Mode.PRIVATE) as cut_extrude_4081_sk2:
        with Locations(Location((456.5, -9, 0), (0, 0, 270))):
            Circle(SKETCH_42_R)
    cut_extrude_4081_tool2 = extrude(cut_extrude_4081_sk2.sketch, amount=-CUT_EXTRUDE_4081_REACH, mode=Mode.PRIVATE) & part.part
    # Эскиз42 → Cut-Extrude 4081 (cut, up to next)
    with BuildSketch(Plane.ZY.offset(158), mode=Mode.PRIVATE) as cut_extrude_4081_sk3:
        with Locations(Location((216.5, -9, 0), (0, 0, 270))):
            Circle(SKETCH_42_R)
    cut_extrude_4081_tool3 = extrude(cut_extrude_4081_sk3.sketch, amount=-CUT_EXTRUDE_4081_REACH, mode=Mode.PRIVATE) & part.part
    # Эскиз42 → Cut-Extrude 4081 (cut, up to next)
    with BuildSketch(Plane.ZY.offset(158), mode=Mode.PRIVATE) as cut_extrude_4081_sk4:
        with Locations(Location((336.5, -9, 0), (0, 0, 270))):
            Circle(SKETCH_42_R)
    cut_extrude_4081_tool4 = extrude(cut_extrude_4081_sk4.sketch, amount=-CUT_EXTRUDE_4081_REACH, mode=Mode.PRIVATE) & part.part
    add(cut_extrude_4081_tool1.solids().sort_by_distance((-158, -9, 96.5))[0], mode=Mode.SUBTRACT)
    add(cut_extrude_4081_tool2.solids().sort_by_distance((-158, -9, 456.5))[0], mode=Mode.SUBTRACT)
    add(cut_extrude_4081_tool3.solids().sort_by_distance((-158, -9, 216.5))[0], mode=Mode.SUBTRACT)
    add(cut_extrude_4081_tool4.solids().sort_by_distance((-158, -9, 336.5))[0], mode=Mode.SUBTRACT)

    # Эскиз43 → Вырез-Вытянуть10 (cut, up to next)
    with BuildSketch(Plane.XZ.offset(2), mode=Mode.PRIVATE) as cut_extrude_10_sk1:
        with Locations(Location((-47, 410, 0), (0, 0, 270))):
            Circle(SKETCH_43_R)
    cut_extrude_10_tool1 = extrude(cut_extrude_10_sk1.sketch, amount=-CUT_EXTRUDE_10_REACH, mode=Mode.PRIVATE) & part.part
    # Эскиз43 → Вырез-Вытянуть10 (cut, up to next)
    with BuildSketch(Plane.XZ.offset(2), mode=Mode.PRIVATE) as cut_extrude_10_sk2:
        with Locations(Location((-11, 410, 0), (0, 0, 270))):
            Circle(SKETCH_43_R)
    cut_extrude_10_tool2 = extrude(cut_extrude_10_sk2.sketch, amount=-CUT_EXTRUDE_10_REACH, mode=Mode.PRIVATE) & part.part
    add(cut_extrude_10_tool1.solids().sort_by_distance((-47, -2, 410))[0], mode=Mode.SUBTRACT)
    add(cut_extrude_10_tool2.solids().sort_by_distance((-11, -2, 410))[0], mode=Mode.SUBTRACT)


solid = part.part
